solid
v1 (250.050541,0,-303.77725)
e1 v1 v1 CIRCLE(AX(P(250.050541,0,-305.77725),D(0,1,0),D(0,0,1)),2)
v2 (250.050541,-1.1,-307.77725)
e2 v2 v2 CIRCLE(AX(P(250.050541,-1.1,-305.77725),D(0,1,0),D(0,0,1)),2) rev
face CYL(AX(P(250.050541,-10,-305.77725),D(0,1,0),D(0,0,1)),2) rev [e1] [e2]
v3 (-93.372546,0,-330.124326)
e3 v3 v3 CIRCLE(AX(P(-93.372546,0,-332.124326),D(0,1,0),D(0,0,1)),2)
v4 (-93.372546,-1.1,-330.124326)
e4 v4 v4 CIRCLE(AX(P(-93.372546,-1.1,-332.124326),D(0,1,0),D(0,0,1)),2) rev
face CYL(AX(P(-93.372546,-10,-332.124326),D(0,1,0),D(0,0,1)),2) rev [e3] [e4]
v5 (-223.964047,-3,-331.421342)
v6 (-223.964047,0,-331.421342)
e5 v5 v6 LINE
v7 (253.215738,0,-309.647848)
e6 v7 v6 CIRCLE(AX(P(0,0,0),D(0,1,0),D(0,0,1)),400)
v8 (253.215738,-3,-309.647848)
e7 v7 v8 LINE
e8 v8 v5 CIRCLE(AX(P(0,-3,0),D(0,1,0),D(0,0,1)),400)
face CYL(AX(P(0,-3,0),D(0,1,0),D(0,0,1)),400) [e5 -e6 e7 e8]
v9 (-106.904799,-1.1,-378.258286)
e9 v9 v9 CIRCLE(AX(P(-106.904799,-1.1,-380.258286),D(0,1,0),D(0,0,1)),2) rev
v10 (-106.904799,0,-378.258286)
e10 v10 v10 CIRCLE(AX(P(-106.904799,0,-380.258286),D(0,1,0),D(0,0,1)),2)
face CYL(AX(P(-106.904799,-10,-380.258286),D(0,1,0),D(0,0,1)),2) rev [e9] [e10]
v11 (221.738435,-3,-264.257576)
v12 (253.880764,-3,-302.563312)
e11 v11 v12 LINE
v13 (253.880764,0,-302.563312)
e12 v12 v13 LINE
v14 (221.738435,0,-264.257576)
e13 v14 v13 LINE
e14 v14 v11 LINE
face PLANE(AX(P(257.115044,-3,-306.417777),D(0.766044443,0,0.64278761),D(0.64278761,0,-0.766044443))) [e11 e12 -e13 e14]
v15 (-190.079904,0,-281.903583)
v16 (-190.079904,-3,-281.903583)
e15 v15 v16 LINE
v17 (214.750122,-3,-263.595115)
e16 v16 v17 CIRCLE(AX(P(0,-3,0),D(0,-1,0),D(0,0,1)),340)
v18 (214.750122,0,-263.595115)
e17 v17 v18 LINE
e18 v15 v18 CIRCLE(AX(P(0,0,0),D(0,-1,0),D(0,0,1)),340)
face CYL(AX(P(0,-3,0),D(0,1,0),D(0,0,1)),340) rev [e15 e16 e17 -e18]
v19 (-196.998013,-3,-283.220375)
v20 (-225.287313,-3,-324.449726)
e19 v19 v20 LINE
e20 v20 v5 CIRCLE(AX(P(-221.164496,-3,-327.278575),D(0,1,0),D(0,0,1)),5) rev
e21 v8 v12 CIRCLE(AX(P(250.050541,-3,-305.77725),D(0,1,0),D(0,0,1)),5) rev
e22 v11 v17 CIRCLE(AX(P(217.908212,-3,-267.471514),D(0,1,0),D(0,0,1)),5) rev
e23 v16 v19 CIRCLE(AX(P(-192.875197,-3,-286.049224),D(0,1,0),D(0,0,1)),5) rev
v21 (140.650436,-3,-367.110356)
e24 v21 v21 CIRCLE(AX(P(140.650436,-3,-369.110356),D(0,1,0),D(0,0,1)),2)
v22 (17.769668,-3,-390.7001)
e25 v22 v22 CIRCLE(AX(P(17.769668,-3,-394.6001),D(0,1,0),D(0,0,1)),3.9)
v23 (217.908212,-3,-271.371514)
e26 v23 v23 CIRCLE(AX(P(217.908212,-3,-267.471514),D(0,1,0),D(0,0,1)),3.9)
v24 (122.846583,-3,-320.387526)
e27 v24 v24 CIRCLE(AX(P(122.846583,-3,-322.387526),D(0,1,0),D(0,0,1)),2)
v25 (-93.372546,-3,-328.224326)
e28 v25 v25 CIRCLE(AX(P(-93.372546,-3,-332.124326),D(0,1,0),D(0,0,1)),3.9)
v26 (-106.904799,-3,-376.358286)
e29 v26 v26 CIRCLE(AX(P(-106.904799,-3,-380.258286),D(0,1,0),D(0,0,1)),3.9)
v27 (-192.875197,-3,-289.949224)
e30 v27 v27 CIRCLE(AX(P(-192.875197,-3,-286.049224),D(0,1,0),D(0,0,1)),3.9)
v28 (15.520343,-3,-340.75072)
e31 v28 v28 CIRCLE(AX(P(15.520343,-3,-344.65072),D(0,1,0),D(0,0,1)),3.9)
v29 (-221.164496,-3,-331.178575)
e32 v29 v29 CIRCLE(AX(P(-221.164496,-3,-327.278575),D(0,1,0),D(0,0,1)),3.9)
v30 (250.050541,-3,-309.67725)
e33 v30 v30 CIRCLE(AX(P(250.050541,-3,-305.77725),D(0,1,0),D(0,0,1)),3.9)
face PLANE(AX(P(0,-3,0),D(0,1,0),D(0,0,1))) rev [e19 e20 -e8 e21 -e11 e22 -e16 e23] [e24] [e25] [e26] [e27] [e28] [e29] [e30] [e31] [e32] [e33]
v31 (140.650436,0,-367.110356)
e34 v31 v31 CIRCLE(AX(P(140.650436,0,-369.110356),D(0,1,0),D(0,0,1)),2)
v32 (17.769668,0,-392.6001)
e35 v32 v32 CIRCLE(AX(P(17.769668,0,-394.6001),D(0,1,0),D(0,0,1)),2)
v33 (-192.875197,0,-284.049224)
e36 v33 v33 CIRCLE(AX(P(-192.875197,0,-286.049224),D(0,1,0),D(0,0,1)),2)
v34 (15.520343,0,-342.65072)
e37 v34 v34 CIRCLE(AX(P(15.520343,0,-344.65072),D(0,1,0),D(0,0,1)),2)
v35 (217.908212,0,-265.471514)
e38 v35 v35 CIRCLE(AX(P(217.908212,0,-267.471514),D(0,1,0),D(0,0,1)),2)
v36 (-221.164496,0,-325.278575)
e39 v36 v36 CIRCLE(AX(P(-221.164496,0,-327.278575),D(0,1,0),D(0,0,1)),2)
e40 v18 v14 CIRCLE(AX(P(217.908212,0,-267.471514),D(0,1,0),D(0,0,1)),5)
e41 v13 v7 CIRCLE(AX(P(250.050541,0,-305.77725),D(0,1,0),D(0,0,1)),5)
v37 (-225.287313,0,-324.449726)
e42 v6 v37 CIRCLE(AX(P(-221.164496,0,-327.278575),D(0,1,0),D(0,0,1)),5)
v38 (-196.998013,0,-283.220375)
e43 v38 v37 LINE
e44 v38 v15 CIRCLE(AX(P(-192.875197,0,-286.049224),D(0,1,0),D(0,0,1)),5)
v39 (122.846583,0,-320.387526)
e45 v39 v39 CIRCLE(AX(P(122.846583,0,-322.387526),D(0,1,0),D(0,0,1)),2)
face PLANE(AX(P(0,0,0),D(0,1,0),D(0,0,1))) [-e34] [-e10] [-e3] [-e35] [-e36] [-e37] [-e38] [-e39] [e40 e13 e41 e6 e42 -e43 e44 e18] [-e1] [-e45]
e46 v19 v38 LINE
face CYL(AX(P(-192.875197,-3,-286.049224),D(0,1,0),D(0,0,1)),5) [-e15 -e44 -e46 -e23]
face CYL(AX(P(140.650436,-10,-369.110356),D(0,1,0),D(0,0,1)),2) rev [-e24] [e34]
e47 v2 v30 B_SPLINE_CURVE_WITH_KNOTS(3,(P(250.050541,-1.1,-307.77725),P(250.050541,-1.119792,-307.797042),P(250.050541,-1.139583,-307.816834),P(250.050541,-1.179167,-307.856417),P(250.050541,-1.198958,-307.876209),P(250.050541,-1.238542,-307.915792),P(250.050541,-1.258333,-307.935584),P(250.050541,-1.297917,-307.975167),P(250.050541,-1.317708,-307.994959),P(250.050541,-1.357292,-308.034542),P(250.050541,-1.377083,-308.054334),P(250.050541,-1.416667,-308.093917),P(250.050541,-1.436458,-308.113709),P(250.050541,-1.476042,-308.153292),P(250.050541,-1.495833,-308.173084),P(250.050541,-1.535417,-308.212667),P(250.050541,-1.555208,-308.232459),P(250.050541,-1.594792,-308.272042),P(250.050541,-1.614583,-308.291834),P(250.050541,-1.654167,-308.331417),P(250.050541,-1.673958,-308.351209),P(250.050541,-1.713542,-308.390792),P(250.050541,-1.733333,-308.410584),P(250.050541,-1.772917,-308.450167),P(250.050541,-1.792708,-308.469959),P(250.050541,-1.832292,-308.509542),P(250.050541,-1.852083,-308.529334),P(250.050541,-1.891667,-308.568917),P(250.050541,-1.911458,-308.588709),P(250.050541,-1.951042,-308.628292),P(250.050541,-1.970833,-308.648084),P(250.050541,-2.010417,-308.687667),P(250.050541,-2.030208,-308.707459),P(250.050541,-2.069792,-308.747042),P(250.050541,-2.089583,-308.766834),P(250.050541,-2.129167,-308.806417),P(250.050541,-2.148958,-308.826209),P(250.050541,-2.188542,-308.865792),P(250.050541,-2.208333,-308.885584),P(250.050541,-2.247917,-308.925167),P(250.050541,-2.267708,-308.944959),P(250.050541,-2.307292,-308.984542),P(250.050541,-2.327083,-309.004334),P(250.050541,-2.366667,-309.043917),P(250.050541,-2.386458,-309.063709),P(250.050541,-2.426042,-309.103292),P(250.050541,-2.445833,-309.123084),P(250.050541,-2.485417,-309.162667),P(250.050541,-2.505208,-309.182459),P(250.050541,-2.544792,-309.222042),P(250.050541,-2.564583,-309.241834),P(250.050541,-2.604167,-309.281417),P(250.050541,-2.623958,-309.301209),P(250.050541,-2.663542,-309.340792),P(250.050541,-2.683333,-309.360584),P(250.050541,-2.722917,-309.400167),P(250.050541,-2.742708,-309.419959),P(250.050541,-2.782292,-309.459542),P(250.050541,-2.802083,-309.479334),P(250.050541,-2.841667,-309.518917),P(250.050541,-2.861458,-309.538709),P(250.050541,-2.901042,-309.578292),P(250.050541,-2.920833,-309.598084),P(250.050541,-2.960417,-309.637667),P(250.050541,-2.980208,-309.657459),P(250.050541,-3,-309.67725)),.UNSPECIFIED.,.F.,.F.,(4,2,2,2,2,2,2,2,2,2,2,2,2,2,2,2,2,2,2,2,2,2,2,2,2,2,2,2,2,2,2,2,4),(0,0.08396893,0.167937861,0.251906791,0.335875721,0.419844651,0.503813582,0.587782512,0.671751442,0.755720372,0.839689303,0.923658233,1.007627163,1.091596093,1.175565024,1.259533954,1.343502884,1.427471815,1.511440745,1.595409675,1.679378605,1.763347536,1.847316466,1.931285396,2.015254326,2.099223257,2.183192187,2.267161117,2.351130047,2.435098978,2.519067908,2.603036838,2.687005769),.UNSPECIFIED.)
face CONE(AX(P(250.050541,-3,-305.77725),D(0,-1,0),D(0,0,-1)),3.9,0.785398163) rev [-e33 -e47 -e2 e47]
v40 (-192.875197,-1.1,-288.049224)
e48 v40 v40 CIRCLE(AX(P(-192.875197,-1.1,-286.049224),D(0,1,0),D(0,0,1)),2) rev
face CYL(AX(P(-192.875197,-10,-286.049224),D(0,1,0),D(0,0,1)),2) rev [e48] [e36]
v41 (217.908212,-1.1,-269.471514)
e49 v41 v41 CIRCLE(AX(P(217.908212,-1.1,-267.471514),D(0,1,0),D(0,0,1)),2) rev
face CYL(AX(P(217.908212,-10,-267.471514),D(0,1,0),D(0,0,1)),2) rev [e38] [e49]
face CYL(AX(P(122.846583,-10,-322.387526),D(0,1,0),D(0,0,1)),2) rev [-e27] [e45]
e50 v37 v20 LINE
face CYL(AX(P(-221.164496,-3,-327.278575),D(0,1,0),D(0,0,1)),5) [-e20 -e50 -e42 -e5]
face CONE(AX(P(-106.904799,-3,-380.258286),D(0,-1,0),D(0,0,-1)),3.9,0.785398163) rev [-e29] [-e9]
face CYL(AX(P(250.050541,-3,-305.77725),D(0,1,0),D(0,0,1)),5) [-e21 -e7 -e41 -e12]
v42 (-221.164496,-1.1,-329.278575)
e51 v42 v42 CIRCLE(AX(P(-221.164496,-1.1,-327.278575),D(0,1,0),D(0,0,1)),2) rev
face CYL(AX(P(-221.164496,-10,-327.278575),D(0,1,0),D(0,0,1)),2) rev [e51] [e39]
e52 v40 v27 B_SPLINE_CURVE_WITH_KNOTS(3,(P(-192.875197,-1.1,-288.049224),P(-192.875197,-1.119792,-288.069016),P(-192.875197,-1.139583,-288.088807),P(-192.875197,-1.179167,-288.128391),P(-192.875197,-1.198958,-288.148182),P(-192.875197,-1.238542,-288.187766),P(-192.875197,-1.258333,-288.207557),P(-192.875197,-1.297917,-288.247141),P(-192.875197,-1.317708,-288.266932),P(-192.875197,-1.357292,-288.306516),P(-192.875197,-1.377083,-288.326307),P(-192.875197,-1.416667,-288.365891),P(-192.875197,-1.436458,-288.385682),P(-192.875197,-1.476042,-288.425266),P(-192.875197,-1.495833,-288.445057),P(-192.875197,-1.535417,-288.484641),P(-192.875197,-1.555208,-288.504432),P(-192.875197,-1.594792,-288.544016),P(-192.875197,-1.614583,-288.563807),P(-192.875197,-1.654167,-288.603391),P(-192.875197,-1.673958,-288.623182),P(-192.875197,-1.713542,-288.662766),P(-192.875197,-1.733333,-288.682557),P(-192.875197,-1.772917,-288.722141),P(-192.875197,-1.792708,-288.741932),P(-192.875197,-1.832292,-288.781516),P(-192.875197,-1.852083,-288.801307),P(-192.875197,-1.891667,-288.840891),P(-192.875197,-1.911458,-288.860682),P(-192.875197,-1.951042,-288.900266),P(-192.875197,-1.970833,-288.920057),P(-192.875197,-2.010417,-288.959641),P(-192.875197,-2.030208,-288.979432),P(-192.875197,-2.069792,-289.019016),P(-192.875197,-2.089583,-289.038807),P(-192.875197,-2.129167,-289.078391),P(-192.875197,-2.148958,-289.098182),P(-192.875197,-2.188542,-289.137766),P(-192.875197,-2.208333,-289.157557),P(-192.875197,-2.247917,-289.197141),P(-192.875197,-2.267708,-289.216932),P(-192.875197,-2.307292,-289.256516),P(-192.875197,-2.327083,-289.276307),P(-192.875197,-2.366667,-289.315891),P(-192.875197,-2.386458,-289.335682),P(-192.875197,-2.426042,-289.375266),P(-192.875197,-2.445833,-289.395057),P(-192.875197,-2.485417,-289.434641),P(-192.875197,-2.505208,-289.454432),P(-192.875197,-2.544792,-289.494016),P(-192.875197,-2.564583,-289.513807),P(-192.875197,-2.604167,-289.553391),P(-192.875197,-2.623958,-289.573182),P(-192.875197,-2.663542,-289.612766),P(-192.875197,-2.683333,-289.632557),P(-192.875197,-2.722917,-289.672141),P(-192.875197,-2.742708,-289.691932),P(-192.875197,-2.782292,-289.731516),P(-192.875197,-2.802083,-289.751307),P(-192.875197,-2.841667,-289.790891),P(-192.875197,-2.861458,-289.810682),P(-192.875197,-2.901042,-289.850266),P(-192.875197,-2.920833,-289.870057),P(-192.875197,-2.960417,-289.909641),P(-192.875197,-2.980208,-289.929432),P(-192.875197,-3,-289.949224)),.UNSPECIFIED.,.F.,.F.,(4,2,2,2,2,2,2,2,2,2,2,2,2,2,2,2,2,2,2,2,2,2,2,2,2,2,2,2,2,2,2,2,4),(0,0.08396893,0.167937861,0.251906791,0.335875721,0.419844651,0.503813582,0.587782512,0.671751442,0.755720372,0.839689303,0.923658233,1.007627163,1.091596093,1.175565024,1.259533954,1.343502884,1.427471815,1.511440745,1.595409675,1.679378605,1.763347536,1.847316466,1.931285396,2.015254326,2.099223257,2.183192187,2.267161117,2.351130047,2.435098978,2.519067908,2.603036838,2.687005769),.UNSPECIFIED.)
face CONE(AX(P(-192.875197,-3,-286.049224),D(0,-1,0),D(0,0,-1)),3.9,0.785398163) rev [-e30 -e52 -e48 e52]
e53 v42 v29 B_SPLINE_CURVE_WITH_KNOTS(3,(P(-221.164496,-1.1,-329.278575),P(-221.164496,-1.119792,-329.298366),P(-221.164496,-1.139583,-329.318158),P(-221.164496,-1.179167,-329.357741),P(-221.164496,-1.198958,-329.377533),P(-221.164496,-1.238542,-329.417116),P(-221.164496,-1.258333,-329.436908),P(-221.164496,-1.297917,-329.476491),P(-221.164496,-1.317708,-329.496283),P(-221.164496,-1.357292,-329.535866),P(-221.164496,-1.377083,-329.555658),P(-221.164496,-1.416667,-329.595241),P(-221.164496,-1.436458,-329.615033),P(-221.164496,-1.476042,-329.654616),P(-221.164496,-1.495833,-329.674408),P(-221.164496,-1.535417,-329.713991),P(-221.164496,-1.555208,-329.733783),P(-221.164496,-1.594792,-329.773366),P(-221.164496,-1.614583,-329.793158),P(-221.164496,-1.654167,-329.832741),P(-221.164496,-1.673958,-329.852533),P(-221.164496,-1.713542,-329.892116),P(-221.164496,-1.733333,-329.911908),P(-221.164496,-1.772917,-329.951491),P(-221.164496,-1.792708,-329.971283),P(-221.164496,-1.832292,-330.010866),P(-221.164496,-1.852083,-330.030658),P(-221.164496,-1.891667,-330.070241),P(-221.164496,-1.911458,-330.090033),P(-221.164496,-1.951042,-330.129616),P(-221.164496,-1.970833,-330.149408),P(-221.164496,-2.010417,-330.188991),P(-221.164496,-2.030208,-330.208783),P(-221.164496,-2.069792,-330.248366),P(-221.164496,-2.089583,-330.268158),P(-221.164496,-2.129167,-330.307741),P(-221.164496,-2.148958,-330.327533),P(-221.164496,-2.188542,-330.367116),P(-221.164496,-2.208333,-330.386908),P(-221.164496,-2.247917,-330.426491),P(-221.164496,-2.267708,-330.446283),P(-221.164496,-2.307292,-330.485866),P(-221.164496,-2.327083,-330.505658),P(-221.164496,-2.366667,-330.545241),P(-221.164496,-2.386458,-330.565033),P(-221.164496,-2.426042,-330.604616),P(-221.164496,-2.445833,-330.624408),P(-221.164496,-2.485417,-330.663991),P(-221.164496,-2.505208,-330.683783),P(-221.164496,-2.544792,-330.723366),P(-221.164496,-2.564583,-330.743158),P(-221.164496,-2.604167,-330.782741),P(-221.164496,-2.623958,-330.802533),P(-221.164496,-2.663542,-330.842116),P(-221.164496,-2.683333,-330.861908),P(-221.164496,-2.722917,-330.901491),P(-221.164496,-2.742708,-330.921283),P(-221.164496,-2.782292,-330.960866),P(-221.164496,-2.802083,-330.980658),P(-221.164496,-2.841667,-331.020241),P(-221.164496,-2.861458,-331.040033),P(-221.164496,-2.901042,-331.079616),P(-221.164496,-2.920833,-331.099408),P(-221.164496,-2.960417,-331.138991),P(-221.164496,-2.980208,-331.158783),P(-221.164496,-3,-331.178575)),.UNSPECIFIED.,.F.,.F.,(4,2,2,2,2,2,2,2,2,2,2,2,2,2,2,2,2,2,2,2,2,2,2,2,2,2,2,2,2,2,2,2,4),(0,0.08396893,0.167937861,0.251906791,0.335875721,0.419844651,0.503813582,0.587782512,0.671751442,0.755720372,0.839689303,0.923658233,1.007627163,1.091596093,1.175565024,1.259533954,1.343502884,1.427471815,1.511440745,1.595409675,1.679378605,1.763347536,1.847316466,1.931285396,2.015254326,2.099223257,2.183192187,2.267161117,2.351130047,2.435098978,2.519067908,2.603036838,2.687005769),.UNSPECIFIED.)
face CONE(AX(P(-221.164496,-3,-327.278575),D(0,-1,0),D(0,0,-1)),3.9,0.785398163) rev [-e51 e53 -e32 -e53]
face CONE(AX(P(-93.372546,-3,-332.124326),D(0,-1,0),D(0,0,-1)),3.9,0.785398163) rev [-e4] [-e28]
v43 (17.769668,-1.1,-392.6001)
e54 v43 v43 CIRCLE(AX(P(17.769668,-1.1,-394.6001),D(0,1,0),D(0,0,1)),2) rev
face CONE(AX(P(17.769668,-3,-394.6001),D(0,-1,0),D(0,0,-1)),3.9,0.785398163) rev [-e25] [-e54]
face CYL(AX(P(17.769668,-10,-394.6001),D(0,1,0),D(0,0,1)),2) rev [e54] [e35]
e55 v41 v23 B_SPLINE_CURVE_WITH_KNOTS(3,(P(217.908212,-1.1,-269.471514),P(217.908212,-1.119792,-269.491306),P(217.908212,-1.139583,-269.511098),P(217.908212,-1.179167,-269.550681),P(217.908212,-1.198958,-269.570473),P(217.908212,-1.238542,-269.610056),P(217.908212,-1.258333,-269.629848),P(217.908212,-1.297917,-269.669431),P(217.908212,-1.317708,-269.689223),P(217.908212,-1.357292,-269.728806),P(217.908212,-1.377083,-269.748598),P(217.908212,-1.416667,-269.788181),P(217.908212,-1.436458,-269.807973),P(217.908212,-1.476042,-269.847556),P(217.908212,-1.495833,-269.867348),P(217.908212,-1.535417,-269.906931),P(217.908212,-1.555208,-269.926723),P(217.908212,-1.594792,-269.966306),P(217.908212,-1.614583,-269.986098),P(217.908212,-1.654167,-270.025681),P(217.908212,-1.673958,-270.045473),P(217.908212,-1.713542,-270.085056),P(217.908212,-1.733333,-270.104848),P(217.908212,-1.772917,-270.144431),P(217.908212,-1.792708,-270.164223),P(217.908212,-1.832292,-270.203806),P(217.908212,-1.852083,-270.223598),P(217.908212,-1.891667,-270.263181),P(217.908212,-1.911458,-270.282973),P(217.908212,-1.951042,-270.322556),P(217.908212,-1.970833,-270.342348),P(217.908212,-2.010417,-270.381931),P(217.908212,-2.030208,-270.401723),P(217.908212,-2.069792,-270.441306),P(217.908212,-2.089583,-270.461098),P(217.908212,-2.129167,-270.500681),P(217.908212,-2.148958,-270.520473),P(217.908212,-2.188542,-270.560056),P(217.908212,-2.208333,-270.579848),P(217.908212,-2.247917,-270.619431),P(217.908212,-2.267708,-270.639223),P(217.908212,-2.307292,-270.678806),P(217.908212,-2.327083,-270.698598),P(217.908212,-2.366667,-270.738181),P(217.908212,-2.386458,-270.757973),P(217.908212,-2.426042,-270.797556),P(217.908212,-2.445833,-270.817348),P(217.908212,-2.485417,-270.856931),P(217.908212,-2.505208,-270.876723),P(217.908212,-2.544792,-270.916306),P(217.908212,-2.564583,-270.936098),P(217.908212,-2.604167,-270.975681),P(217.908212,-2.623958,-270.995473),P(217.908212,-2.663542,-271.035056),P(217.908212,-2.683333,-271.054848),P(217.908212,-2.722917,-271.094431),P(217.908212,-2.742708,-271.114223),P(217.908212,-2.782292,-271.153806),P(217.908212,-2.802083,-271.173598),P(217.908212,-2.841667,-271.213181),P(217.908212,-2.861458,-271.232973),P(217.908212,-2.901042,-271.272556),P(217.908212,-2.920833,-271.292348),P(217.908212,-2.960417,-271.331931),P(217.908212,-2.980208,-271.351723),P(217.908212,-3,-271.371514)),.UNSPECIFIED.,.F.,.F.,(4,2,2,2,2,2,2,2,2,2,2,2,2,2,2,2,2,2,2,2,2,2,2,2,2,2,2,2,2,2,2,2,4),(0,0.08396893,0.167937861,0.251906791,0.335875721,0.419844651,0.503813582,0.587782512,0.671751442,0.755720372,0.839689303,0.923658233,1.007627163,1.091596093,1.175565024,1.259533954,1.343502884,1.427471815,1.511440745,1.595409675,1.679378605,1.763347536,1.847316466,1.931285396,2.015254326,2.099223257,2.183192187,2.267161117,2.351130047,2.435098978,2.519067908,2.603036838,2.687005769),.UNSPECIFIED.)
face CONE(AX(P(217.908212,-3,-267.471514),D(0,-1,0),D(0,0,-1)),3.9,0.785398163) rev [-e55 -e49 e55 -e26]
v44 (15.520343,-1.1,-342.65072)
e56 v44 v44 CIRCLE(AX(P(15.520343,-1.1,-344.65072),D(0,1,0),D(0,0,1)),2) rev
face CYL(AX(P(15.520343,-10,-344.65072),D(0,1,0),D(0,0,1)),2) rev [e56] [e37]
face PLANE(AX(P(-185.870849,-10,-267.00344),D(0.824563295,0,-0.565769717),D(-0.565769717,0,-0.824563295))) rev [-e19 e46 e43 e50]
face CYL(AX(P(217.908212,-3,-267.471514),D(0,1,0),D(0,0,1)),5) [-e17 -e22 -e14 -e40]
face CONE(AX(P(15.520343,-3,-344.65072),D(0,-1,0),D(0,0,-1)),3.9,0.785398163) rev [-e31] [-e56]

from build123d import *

# Parameters (mm, degrees)
SM_BASE_FLANGE_1_DEPTH = 3
CUT_EXTRUDE_1_DEPTH    = 10
FILLET_1_R             = 5
FILLET_2_R             = 5
SKETCH_3_R             = 2
CUT_EXTRUDE_2_DEPTH    = 10
SKETCH_5_R             = 2
CUT_EXTRUDE_4_DEPTH    = 10
CHAMFER_1_SIZE         = 1.9
SKETCH_6_R             = 2
CUT_EXTRUDE_5_DEPTH    = 10


# Sheet-metal steps are written as plain solids
with BuildPart() as part:
    # Sketch 1 → Базовая кромка1 (new body)
    with BuildSketch(Plane(origin=(0, 0, 0), x_dir=(1, 0, 0), z_dir=(0, 1, 0))):
        with BuildLine():
            Line((-218.547787293, 260.45511066), (-257.115043875, 306.417777248))
            ThreePointArc((-257.115043875, 306.417777248), (0, 400), (257.115043875, 306.417777248))
            Line((257.115043875, 306.417777248), (218.547787293, 260.45511066))
            ThreePointArc((218.547787293, 260.45511066), (0, 340), (-218.547787293, 260.45511066))
        make_face()
    extrude(amount=-SM_BASE_FLANGE_1_DEPTH)

    # Эскиз2 → Вырез-Вытянуть1 (cut)
    with BuildSketch(Plane(origin=(0, 0, 0), x_dir=(1, 0, 0), z_dir=(0, 1, 0))):
        Polygon((-185.870849123, 267.003439601), (-232.668944094, 335.207852497), (-262.024399195, 311.215696318), (-219.773904278, 254.720487984), align=None)
    extrude(amount=-CUT_EXTRUDE_1_DEPTH, mode=Mode.SUBTRACT)

    # Скругление1
    fillet_1_edges = [part.edges().sort_by_distance(p)[0] for p in [
        (-194.171567718, -1.5, -279.101061069),
        (-228.118354699, -1.5, -328.575738985),
    ]]
    fillet(fillet_1_edges, radius=FILLET_1_R)

    # Скругление2
    fillet_2_edges = [part.edges().sort_by_distance(p)[0] for p in [
        (257.115043875, -1.5, -306.417777248),
        (218.547787293, -1.5, -260.45511066),
    ]]
    fillet(fillet_2_edges, radius=FILLET_2_R)

    # Эскиз3 → Вырез-Вытянуть2 (cut)
    with BuildSketch(Plane(origin=(0, 0, 0), x_dir=(1, 0, 0), z_dir=(0, 1, 0))):
        with Locations(Location((-221.164496487, 327.278574755, 0), (0, 0, 270))):
            Circle(SKETCH_3_R)
        with Locations(Location((-192.875196767, 286.049223862, 0), (0, 0, 270))):
            Circle(SKETCH_3_R)
        with Locations(Location((217.908212497, 267.471514233, 0), (0, 0, 270))):
            Circle(SKETCH_3_R)
        with Locations(Location((250.050541416, 305.777250197, 0), (0, 0, 270))):
            Circle(SKETCH_3_R)
    extrude(amount=-CUT_EXTRUDE_2_DEPTH, mode=Mode.SUBTRACT)

    # Эскиз5 → Вырез-Вытянуть4 (cut)
    with BuildSketch(Plane(origin=(0, 0, 0), x_dir=(1, 0, 0), z_dir=(0, 1, 0))):
        with Locations(Location((15.5203425, 344.65072025, 0), (0, 0, 270))):
            Circle(SKETCH_5_R)
        with Locations(Location((17.7696675, 394.600099996, 0), (0, 0, 270))):
            Circle(SKETCH_5_R)
        with Locations(Location((-106.904799365, 380.258285738, 0), (0, 0, 270))):
            Circle(SKETCH_5_R)
        with Locations(Location((-93.372546281, 332.124325518, 0), (0, 0, 270))):
            Circle(SKETCH_5_R)
    extrude(amount=-CUT_EXTRUDE_4_DEPTH, mode=Mode.SUBTRACT)

    # Фаска1
    chamfer_1_edges = [part.edges().sort_by_distance(p)[0] for p in [
        (-93.372546281, -3, -334.124325518),
        (-221.164496487, -3, -329.278574755),
        (-192.875196767, -3, -288.049223862),
        (217.908212497, -3, -269.471514233),
        (250.050541416, -3, -307.777250197),
        (15.5203425, -3, -346.65072025),
        (17.7696675, -3, -396.600099996),
        (-106.904799365, -3, -382.258285738),
    ]]
    chamfer(chamfer_1_edges, length=CHAMFER_1_SIZE)

    # Эскиз6 → Вырез-Вытянуть5 (cut)
    with BuildSketch(Plane(origin=(0, 0, 0), x_dir=(1, 0, 0), z_dir=(0, 1, 0))):
        with Locations(Location((140.650436017, 369.110355921, 0), (0, 0, 270))):
            Circle(SKETCH_6_R)
        with Locations(Location((122.846583356, 322.387526058, 0), (0, 0, 270))):
            Circle(SKETCH_6_R)
    extrude(amount=-CUT_EXTRUDE_5_DEPTH, mode=Mode.SUBTRACT)


solid = part.part
